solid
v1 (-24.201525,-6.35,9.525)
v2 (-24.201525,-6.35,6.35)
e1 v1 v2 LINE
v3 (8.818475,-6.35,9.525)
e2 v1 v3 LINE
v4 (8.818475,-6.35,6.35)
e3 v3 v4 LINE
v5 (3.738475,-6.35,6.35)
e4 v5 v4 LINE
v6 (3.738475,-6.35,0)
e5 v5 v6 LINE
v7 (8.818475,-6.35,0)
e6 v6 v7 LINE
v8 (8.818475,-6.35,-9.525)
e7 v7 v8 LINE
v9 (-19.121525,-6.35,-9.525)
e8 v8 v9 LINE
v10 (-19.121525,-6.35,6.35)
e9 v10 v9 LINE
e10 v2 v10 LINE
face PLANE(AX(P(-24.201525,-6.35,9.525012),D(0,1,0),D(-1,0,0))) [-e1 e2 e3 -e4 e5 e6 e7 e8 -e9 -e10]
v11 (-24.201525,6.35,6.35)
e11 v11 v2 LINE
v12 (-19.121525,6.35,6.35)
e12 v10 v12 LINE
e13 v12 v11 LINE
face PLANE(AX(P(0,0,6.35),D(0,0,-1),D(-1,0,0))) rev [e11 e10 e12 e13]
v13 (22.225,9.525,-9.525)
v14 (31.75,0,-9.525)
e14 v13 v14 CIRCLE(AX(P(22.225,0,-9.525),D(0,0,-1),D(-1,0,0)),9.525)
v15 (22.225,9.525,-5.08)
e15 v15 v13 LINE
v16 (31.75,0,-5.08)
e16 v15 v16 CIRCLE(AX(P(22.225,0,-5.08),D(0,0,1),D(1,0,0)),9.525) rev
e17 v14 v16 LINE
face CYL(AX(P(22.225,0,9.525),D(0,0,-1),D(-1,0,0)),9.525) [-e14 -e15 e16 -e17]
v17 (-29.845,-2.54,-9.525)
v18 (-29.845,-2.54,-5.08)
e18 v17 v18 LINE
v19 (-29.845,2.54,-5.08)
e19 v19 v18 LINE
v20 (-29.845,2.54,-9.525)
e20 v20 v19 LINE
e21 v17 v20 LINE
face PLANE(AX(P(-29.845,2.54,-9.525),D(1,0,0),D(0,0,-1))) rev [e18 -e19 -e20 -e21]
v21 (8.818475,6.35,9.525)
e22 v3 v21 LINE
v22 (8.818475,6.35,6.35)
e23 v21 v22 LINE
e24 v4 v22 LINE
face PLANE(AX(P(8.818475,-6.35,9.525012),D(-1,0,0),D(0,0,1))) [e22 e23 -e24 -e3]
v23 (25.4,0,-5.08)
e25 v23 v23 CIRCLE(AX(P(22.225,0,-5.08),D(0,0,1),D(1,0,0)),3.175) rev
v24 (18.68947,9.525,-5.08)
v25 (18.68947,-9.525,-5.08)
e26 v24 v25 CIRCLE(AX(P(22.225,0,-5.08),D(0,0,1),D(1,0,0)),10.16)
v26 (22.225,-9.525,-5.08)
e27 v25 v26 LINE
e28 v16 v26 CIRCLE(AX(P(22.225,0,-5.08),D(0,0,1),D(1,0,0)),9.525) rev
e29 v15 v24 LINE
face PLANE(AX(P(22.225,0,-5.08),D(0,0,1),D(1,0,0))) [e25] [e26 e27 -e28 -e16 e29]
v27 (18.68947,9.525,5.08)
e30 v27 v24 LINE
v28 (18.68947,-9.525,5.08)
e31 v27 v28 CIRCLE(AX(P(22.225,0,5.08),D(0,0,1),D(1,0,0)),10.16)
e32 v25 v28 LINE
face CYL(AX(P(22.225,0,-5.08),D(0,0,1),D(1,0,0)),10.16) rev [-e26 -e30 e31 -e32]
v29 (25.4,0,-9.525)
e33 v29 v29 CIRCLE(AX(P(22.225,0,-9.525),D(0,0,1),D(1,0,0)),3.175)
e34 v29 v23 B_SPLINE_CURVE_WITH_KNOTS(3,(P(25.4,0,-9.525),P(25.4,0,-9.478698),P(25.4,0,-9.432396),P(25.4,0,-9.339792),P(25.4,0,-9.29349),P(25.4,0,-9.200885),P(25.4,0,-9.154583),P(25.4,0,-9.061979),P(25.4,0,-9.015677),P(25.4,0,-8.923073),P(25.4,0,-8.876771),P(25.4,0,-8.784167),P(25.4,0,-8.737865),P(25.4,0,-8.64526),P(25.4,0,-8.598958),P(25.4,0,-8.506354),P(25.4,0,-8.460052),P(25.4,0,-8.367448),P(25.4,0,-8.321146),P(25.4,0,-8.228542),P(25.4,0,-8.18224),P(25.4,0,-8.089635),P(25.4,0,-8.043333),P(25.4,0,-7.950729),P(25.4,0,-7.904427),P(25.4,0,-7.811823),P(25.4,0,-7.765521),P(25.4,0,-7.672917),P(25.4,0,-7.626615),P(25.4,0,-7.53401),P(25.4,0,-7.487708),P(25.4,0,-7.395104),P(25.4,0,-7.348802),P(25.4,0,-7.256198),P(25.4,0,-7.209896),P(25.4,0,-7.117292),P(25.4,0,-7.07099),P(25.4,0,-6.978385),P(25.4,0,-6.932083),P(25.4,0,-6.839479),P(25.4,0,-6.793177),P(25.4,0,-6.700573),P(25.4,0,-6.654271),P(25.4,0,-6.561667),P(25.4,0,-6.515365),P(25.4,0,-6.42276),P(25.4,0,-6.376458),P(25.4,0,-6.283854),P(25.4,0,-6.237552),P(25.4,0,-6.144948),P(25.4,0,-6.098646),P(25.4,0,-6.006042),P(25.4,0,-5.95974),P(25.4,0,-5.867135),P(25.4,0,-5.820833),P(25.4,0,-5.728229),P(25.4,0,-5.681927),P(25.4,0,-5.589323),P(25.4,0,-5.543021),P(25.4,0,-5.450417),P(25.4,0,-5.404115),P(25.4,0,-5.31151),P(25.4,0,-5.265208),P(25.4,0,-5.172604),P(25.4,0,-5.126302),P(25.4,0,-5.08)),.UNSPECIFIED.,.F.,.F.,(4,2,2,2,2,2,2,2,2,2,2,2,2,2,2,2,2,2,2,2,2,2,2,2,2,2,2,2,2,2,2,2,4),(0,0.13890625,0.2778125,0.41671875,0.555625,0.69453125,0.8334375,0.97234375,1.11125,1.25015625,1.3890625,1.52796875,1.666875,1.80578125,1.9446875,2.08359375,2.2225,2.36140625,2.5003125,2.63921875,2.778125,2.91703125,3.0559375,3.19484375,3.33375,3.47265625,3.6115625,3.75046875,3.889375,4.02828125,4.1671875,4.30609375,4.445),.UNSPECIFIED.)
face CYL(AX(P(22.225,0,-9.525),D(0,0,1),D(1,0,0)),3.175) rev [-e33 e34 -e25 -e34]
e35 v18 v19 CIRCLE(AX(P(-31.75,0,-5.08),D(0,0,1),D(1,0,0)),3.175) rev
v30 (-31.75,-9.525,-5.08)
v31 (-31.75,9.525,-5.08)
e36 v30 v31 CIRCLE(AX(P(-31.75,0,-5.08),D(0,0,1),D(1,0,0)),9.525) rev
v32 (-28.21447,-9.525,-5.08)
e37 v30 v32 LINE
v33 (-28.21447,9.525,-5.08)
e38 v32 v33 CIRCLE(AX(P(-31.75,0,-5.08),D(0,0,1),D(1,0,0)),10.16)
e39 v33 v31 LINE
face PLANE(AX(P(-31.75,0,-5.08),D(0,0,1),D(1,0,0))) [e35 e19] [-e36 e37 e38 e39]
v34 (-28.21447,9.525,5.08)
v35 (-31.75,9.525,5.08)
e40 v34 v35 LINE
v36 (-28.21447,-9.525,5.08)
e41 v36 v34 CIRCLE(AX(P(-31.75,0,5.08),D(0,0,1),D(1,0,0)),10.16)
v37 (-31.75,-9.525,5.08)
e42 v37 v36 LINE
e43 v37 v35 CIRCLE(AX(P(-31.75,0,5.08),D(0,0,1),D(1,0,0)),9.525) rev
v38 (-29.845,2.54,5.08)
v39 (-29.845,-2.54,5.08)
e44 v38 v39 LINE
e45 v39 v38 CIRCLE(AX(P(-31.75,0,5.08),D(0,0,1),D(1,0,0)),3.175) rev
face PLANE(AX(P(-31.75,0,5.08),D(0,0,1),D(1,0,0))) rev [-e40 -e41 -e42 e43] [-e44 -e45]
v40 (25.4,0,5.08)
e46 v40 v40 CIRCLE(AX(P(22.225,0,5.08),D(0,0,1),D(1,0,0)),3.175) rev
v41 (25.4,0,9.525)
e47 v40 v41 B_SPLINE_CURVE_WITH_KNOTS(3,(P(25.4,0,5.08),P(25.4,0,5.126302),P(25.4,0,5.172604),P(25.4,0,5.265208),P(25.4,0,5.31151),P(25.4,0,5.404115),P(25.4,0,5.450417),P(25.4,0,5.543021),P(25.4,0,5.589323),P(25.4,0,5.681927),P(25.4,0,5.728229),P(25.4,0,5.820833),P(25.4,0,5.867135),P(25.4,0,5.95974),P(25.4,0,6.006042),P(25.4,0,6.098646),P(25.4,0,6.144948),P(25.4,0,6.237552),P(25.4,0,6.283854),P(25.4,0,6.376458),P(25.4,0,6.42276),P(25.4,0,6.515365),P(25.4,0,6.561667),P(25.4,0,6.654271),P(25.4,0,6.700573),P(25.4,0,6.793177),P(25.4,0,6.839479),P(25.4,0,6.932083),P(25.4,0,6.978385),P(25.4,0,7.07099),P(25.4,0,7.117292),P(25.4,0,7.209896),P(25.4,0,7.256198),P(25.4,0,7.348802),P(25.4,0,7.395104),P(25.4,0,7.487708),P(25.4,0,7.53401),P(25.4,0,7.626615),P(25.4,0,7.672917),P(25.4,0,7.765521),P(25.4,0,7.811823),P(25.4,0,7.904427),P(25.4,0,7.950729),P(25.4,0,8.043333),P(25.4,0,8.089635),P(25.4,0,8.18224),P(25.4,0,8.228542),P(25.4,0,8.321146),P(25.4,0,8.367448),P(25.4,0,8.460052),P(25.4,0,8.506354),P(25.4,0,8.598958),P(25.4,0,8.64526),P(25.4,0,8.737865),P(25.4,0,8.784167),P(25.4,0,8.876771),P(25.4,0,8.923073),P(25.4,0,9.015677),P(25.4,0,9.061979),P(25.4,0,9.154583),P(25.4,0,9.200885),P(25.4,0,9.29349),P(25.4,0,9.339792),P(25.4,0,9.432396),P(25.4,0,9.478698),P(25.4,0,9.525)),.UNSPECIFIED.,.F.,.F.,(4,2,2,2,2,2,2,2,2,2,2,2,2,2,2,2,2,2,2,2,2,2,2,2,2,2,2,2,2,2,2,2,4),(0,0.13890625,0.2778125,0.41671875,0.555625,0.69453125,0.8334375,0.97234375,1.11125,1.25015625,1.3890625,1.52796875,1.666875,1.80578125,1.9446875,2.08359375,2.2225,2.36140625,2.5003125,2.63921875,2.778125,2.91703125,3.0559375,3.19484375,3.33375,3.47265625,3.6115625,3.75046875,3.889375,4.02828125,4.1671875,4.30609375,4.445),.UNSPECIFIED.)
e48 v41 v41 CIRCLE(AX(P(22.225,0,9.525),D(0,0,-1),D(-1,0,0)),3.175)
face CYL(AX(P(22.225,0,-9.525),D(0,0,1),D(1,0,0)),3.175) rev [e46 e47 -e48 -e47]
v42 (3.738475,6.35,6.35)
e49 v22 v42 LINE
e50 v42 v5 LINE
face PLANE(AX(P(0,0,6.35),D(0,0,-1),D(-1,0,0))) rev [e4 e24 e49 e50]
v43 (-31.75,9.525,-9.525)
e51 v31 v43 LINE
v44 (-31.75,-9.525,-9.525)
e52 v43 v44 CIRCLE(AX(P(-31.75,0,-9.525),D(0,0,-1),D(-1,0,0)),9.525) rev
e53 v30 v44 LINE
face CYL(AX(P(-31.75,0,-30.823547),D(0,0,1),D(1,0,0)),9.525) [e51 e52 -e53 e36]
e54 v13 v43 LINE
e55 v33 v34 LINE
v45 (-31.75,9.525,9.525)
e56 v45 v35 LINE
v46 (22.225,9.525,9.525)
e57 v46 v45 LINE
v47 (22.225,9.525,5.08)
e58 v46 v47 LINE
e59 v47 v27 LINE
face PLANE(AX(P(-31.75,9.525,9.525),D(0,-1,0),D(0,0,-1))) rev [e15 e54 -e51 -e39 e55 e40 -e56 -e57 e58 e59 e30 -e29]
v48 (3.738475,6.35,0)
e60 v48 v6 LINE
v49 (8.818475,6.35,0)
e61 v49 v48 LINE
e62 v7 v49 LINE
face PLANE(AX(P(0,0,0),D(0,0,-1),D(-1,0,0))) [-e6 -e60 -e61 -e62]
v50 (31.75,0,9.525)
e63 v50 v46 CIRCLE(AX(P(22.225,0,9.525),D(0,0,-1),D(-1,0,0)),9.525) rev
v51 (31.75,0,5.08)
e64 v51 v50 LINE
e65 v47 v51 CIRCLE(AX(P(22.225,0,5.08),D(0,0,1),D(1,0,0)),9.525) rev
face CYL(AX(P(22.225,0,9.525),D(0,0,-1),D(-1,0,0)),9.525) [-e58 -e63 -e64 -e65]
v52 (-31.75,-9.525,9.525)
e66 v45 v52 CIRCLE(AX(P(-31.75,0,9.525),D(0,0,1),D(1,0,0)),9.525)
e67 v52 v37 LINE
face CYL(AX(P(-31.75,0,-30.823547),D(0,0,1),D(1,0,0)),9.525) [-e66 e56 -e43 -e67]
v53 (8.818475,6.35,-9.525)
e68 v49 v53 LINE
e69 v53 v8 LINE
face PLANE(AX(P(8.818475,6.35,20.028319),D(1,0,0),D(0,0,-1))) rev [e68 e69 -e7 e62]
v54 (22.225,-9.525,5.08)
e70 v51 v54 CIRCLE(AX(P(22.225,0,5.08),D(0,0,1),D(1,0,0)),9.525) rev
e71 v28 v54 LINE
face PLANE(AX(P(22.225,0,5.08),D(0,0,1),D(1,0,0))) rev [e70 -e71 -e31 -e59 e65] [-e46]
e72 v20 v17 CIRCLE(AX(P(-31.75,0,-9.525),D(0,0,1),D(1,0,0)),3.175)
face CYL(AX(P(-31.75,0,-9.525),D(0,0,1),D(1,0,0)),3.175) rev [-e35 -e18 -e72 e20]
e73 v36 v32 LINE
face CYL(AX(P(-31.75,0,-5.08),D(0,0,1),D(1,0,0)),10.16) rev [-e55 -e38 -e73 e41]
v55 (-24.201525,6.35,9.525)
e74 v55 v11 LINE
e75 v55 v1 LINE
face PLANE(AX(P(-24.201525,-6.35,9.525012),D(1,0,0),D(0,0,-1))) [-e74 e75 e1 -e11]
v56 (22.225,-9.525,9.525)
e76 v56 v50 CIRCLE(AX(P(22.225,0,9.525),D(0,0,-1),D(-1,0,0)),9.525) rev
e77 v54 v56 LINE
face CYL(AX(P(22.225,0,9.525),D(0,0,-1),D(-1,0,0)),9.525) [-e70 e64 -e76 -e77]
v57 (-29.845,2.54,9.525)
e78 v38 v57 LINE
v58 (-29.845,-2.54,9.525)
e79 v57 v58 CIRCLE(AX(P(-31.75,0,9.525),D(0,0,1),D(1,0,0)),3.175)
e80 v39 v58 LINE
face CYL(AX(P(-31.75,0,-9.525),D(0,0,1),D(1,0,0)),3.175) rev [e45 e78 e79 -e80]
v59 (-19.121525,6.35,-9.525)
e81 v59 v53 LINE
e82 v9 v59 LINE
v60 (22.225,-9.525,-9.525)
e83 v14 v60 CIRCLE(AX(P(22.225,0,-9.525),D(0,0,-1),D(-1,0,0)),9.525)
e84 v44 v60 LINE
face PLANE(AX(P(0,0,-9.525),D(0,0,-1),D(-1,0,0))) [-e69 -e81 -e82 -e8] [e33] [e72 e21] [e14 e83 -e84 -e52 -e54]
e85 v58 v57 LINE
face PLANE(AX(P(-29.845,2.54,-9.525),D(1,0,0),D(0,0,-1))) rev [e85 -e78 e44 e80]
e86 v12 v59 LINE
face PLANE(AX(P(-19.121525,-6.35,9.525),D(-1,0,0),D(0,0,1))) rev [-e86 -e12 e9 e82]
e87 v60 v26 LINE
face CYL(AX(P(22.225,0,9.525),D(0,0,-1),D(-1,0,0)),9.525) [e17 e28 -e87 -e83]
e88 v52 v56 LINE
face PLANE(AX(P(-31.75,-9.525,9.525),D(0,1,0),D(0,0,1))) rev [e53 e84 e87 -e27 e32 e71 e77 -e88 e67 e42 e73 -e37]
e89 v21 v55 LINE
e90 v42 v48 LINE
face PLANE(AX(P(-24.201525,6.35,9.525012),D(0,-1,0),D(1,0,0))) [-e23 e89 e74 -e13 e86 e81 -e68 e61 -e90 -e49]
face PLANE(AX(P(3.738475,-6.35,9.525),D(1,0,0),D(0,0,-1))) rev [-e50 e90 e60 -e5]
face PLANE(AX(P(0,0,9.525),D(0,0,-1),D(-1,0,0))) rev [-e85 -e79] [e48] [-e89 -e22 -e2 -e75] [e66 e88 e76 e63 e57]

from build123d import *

# Parameters (mm, degrees)
SKETCH1_W               = 63.5
SKETCH1_H               = 19.05
BOSS_EXTRUDE1_DEPTH     = 9.525
FILLET1_R               = 9.525
CUT_EXTRUDE1_DEPTH      = 39.232062788
CUT_EXTRUDE1_DEPTH_BACK = 39.232062788
SKETCH2_R               = 3.175
CUT_EXTRUDE2_DEPTH      = 39.232062788
CUT_EXTRUDE2_DEPTH_BACK = 3.175
SKETCH3_W               = 33.02
SKETCH3_H               = 12.7
SKETCH6_W               = 22.86
SKETCH6_H               = 12.7
CUT_EXTRUDE4_DEPTH      = 39.232062788
SKETCH7_W               = 5.08
SKETCH7_H               = 12.7
CUT_EXTRUDE5_DEPTH      = 9.525
BOSS_EXTRUDE2_DEPTH     = 19.05
CUT_EXTRUDE6_DEPTH      = 47.446245812
SKETCH4_R               = 10.16
CUT_EXTRUDE3_DEPTH      = 5.08


with BuildPart() as part:
    # Sketch1 → Boss-Extrude1 (new, symmetric)
    with BuildSketch(Plane.XY):
        Rectangle(SKETCH1_W, SKETCH1_H)
    extrude(amount=BOSS_EXTRUDE1_DEPTH, both=True)

    # Fillet1
    fillet1_edges = [part.edges().sort_by_distance(p)[0] for p in [
        (31.75, -9.525, 0),
        (31.75, 9.525, 0),
    ]]
    fillet(fillet1_edges, radius=FILLET1_R - 0.0001)  # a hair under: the kernel refuses the full size

    # Sketch2 → Cut-Extrude1 (cut, two sides: drawn at the far end of the back side and taken through both)
    with BuildSketch(Plane.XY.offset(9.525).offset(-CUT_EXTRUDE1_DEPTH_BACK)):
        with Locations((22.225, 0)):
            Circle(SKETCH2_R)
    extrude(amount=CUT_EXTRUDE1_DEPTH + CUT_EXTRUDE1_DEPTH_BACK, mode=Mode.SUBTRACT)

    # Sketch3 → Cut-Extrude2 (cut, two sides: drawn at the far end of the back side and taken through both)
    with BuildSketch(Plane.XY.offset(9.525).offset(-CUT_EXTRUDE2_DEPTH_BACK)):
        with Locations((-7.691525386, 0)):
            Rectangle(SKETCH3_W, SKETCH3_H)
    extrude(amount=CUT_EXTRUDE2_DEPTH + CUT_EXTRUDE2_DEPTH_BACK, mode=Mode.SUBTRACT)

    # Sketch6 → Cut-Extrude4 (cut, through all)
    with BuildSketch(Plane(origin=(0, 0, -9.525), x_dir=(-1, 0, 0), z_dir=(0, 0, -1))):
        with Locations((7.691525386, 0)):
            Rectangle(SKETCH6_W, SKETCH6_H)
    extrude(amount=-CUT_EXTRUDE4_DEPTH, mode=Mode.SUBTRACT)

    # Sketch7 → Cut-Extrude5 (cut)
    with BuildSketch(Plane(origin=(0, 0, -9.525), x_dir=(-1, 0, 0), z_dir=(0, 0, -1))):
        with Locations((-6.278474614, 0)):
            Rectangle(SKETCH7_W, SKETCH7_H)
    extrude(amount=-CUT_EXTRUDE5_DEPTH, mode=Mode.SUBTRACT)

    # Sketch8 → Boss-Extrude2 (add)
    with BuildSketch(Plane.XY.offset(9.525)):
        with BuildLine():
            Line((-31.75, 9.525), (-31.75, -9.525))
            ThreePointArc((-31.75, -9.525), (-41.275, 0), (-31.75, 9.525))
        make_face()
    extrude(amount=-BOSS_EXTRUDE2_DEPTH)

    # Sketch9 → Cut-Extrude6 (cut, through all)
    with BuildSketch(Plane.XY.offset(9.525)):
        with BuildLine():
            Line((-29.845, 2.54), (-29.845, -2.54))
            ThreePointArc((-29.845, -2.54), (-34.925, 0), (-29.845, 2.54))
        make_face()
    extrude(amount=-CUT_EXTRUDE6_DEPTH, mode=Mode.SUBTRACT)

    # Sketch4 → Cut-Extrude3 (cut, symmetric)
    with BuildSketch(Plane.XY):
        with Locations((22.225, 0)):
            Circle(SKETCH4_R)
        with Locations((-31.75, 0)):
            Circle(SKETCH4_R)
    extrude(amount=CUT_EXTRUDE3_DEPTH, both=True, mode=Mode.SUBTRACT)


solid = part.part
